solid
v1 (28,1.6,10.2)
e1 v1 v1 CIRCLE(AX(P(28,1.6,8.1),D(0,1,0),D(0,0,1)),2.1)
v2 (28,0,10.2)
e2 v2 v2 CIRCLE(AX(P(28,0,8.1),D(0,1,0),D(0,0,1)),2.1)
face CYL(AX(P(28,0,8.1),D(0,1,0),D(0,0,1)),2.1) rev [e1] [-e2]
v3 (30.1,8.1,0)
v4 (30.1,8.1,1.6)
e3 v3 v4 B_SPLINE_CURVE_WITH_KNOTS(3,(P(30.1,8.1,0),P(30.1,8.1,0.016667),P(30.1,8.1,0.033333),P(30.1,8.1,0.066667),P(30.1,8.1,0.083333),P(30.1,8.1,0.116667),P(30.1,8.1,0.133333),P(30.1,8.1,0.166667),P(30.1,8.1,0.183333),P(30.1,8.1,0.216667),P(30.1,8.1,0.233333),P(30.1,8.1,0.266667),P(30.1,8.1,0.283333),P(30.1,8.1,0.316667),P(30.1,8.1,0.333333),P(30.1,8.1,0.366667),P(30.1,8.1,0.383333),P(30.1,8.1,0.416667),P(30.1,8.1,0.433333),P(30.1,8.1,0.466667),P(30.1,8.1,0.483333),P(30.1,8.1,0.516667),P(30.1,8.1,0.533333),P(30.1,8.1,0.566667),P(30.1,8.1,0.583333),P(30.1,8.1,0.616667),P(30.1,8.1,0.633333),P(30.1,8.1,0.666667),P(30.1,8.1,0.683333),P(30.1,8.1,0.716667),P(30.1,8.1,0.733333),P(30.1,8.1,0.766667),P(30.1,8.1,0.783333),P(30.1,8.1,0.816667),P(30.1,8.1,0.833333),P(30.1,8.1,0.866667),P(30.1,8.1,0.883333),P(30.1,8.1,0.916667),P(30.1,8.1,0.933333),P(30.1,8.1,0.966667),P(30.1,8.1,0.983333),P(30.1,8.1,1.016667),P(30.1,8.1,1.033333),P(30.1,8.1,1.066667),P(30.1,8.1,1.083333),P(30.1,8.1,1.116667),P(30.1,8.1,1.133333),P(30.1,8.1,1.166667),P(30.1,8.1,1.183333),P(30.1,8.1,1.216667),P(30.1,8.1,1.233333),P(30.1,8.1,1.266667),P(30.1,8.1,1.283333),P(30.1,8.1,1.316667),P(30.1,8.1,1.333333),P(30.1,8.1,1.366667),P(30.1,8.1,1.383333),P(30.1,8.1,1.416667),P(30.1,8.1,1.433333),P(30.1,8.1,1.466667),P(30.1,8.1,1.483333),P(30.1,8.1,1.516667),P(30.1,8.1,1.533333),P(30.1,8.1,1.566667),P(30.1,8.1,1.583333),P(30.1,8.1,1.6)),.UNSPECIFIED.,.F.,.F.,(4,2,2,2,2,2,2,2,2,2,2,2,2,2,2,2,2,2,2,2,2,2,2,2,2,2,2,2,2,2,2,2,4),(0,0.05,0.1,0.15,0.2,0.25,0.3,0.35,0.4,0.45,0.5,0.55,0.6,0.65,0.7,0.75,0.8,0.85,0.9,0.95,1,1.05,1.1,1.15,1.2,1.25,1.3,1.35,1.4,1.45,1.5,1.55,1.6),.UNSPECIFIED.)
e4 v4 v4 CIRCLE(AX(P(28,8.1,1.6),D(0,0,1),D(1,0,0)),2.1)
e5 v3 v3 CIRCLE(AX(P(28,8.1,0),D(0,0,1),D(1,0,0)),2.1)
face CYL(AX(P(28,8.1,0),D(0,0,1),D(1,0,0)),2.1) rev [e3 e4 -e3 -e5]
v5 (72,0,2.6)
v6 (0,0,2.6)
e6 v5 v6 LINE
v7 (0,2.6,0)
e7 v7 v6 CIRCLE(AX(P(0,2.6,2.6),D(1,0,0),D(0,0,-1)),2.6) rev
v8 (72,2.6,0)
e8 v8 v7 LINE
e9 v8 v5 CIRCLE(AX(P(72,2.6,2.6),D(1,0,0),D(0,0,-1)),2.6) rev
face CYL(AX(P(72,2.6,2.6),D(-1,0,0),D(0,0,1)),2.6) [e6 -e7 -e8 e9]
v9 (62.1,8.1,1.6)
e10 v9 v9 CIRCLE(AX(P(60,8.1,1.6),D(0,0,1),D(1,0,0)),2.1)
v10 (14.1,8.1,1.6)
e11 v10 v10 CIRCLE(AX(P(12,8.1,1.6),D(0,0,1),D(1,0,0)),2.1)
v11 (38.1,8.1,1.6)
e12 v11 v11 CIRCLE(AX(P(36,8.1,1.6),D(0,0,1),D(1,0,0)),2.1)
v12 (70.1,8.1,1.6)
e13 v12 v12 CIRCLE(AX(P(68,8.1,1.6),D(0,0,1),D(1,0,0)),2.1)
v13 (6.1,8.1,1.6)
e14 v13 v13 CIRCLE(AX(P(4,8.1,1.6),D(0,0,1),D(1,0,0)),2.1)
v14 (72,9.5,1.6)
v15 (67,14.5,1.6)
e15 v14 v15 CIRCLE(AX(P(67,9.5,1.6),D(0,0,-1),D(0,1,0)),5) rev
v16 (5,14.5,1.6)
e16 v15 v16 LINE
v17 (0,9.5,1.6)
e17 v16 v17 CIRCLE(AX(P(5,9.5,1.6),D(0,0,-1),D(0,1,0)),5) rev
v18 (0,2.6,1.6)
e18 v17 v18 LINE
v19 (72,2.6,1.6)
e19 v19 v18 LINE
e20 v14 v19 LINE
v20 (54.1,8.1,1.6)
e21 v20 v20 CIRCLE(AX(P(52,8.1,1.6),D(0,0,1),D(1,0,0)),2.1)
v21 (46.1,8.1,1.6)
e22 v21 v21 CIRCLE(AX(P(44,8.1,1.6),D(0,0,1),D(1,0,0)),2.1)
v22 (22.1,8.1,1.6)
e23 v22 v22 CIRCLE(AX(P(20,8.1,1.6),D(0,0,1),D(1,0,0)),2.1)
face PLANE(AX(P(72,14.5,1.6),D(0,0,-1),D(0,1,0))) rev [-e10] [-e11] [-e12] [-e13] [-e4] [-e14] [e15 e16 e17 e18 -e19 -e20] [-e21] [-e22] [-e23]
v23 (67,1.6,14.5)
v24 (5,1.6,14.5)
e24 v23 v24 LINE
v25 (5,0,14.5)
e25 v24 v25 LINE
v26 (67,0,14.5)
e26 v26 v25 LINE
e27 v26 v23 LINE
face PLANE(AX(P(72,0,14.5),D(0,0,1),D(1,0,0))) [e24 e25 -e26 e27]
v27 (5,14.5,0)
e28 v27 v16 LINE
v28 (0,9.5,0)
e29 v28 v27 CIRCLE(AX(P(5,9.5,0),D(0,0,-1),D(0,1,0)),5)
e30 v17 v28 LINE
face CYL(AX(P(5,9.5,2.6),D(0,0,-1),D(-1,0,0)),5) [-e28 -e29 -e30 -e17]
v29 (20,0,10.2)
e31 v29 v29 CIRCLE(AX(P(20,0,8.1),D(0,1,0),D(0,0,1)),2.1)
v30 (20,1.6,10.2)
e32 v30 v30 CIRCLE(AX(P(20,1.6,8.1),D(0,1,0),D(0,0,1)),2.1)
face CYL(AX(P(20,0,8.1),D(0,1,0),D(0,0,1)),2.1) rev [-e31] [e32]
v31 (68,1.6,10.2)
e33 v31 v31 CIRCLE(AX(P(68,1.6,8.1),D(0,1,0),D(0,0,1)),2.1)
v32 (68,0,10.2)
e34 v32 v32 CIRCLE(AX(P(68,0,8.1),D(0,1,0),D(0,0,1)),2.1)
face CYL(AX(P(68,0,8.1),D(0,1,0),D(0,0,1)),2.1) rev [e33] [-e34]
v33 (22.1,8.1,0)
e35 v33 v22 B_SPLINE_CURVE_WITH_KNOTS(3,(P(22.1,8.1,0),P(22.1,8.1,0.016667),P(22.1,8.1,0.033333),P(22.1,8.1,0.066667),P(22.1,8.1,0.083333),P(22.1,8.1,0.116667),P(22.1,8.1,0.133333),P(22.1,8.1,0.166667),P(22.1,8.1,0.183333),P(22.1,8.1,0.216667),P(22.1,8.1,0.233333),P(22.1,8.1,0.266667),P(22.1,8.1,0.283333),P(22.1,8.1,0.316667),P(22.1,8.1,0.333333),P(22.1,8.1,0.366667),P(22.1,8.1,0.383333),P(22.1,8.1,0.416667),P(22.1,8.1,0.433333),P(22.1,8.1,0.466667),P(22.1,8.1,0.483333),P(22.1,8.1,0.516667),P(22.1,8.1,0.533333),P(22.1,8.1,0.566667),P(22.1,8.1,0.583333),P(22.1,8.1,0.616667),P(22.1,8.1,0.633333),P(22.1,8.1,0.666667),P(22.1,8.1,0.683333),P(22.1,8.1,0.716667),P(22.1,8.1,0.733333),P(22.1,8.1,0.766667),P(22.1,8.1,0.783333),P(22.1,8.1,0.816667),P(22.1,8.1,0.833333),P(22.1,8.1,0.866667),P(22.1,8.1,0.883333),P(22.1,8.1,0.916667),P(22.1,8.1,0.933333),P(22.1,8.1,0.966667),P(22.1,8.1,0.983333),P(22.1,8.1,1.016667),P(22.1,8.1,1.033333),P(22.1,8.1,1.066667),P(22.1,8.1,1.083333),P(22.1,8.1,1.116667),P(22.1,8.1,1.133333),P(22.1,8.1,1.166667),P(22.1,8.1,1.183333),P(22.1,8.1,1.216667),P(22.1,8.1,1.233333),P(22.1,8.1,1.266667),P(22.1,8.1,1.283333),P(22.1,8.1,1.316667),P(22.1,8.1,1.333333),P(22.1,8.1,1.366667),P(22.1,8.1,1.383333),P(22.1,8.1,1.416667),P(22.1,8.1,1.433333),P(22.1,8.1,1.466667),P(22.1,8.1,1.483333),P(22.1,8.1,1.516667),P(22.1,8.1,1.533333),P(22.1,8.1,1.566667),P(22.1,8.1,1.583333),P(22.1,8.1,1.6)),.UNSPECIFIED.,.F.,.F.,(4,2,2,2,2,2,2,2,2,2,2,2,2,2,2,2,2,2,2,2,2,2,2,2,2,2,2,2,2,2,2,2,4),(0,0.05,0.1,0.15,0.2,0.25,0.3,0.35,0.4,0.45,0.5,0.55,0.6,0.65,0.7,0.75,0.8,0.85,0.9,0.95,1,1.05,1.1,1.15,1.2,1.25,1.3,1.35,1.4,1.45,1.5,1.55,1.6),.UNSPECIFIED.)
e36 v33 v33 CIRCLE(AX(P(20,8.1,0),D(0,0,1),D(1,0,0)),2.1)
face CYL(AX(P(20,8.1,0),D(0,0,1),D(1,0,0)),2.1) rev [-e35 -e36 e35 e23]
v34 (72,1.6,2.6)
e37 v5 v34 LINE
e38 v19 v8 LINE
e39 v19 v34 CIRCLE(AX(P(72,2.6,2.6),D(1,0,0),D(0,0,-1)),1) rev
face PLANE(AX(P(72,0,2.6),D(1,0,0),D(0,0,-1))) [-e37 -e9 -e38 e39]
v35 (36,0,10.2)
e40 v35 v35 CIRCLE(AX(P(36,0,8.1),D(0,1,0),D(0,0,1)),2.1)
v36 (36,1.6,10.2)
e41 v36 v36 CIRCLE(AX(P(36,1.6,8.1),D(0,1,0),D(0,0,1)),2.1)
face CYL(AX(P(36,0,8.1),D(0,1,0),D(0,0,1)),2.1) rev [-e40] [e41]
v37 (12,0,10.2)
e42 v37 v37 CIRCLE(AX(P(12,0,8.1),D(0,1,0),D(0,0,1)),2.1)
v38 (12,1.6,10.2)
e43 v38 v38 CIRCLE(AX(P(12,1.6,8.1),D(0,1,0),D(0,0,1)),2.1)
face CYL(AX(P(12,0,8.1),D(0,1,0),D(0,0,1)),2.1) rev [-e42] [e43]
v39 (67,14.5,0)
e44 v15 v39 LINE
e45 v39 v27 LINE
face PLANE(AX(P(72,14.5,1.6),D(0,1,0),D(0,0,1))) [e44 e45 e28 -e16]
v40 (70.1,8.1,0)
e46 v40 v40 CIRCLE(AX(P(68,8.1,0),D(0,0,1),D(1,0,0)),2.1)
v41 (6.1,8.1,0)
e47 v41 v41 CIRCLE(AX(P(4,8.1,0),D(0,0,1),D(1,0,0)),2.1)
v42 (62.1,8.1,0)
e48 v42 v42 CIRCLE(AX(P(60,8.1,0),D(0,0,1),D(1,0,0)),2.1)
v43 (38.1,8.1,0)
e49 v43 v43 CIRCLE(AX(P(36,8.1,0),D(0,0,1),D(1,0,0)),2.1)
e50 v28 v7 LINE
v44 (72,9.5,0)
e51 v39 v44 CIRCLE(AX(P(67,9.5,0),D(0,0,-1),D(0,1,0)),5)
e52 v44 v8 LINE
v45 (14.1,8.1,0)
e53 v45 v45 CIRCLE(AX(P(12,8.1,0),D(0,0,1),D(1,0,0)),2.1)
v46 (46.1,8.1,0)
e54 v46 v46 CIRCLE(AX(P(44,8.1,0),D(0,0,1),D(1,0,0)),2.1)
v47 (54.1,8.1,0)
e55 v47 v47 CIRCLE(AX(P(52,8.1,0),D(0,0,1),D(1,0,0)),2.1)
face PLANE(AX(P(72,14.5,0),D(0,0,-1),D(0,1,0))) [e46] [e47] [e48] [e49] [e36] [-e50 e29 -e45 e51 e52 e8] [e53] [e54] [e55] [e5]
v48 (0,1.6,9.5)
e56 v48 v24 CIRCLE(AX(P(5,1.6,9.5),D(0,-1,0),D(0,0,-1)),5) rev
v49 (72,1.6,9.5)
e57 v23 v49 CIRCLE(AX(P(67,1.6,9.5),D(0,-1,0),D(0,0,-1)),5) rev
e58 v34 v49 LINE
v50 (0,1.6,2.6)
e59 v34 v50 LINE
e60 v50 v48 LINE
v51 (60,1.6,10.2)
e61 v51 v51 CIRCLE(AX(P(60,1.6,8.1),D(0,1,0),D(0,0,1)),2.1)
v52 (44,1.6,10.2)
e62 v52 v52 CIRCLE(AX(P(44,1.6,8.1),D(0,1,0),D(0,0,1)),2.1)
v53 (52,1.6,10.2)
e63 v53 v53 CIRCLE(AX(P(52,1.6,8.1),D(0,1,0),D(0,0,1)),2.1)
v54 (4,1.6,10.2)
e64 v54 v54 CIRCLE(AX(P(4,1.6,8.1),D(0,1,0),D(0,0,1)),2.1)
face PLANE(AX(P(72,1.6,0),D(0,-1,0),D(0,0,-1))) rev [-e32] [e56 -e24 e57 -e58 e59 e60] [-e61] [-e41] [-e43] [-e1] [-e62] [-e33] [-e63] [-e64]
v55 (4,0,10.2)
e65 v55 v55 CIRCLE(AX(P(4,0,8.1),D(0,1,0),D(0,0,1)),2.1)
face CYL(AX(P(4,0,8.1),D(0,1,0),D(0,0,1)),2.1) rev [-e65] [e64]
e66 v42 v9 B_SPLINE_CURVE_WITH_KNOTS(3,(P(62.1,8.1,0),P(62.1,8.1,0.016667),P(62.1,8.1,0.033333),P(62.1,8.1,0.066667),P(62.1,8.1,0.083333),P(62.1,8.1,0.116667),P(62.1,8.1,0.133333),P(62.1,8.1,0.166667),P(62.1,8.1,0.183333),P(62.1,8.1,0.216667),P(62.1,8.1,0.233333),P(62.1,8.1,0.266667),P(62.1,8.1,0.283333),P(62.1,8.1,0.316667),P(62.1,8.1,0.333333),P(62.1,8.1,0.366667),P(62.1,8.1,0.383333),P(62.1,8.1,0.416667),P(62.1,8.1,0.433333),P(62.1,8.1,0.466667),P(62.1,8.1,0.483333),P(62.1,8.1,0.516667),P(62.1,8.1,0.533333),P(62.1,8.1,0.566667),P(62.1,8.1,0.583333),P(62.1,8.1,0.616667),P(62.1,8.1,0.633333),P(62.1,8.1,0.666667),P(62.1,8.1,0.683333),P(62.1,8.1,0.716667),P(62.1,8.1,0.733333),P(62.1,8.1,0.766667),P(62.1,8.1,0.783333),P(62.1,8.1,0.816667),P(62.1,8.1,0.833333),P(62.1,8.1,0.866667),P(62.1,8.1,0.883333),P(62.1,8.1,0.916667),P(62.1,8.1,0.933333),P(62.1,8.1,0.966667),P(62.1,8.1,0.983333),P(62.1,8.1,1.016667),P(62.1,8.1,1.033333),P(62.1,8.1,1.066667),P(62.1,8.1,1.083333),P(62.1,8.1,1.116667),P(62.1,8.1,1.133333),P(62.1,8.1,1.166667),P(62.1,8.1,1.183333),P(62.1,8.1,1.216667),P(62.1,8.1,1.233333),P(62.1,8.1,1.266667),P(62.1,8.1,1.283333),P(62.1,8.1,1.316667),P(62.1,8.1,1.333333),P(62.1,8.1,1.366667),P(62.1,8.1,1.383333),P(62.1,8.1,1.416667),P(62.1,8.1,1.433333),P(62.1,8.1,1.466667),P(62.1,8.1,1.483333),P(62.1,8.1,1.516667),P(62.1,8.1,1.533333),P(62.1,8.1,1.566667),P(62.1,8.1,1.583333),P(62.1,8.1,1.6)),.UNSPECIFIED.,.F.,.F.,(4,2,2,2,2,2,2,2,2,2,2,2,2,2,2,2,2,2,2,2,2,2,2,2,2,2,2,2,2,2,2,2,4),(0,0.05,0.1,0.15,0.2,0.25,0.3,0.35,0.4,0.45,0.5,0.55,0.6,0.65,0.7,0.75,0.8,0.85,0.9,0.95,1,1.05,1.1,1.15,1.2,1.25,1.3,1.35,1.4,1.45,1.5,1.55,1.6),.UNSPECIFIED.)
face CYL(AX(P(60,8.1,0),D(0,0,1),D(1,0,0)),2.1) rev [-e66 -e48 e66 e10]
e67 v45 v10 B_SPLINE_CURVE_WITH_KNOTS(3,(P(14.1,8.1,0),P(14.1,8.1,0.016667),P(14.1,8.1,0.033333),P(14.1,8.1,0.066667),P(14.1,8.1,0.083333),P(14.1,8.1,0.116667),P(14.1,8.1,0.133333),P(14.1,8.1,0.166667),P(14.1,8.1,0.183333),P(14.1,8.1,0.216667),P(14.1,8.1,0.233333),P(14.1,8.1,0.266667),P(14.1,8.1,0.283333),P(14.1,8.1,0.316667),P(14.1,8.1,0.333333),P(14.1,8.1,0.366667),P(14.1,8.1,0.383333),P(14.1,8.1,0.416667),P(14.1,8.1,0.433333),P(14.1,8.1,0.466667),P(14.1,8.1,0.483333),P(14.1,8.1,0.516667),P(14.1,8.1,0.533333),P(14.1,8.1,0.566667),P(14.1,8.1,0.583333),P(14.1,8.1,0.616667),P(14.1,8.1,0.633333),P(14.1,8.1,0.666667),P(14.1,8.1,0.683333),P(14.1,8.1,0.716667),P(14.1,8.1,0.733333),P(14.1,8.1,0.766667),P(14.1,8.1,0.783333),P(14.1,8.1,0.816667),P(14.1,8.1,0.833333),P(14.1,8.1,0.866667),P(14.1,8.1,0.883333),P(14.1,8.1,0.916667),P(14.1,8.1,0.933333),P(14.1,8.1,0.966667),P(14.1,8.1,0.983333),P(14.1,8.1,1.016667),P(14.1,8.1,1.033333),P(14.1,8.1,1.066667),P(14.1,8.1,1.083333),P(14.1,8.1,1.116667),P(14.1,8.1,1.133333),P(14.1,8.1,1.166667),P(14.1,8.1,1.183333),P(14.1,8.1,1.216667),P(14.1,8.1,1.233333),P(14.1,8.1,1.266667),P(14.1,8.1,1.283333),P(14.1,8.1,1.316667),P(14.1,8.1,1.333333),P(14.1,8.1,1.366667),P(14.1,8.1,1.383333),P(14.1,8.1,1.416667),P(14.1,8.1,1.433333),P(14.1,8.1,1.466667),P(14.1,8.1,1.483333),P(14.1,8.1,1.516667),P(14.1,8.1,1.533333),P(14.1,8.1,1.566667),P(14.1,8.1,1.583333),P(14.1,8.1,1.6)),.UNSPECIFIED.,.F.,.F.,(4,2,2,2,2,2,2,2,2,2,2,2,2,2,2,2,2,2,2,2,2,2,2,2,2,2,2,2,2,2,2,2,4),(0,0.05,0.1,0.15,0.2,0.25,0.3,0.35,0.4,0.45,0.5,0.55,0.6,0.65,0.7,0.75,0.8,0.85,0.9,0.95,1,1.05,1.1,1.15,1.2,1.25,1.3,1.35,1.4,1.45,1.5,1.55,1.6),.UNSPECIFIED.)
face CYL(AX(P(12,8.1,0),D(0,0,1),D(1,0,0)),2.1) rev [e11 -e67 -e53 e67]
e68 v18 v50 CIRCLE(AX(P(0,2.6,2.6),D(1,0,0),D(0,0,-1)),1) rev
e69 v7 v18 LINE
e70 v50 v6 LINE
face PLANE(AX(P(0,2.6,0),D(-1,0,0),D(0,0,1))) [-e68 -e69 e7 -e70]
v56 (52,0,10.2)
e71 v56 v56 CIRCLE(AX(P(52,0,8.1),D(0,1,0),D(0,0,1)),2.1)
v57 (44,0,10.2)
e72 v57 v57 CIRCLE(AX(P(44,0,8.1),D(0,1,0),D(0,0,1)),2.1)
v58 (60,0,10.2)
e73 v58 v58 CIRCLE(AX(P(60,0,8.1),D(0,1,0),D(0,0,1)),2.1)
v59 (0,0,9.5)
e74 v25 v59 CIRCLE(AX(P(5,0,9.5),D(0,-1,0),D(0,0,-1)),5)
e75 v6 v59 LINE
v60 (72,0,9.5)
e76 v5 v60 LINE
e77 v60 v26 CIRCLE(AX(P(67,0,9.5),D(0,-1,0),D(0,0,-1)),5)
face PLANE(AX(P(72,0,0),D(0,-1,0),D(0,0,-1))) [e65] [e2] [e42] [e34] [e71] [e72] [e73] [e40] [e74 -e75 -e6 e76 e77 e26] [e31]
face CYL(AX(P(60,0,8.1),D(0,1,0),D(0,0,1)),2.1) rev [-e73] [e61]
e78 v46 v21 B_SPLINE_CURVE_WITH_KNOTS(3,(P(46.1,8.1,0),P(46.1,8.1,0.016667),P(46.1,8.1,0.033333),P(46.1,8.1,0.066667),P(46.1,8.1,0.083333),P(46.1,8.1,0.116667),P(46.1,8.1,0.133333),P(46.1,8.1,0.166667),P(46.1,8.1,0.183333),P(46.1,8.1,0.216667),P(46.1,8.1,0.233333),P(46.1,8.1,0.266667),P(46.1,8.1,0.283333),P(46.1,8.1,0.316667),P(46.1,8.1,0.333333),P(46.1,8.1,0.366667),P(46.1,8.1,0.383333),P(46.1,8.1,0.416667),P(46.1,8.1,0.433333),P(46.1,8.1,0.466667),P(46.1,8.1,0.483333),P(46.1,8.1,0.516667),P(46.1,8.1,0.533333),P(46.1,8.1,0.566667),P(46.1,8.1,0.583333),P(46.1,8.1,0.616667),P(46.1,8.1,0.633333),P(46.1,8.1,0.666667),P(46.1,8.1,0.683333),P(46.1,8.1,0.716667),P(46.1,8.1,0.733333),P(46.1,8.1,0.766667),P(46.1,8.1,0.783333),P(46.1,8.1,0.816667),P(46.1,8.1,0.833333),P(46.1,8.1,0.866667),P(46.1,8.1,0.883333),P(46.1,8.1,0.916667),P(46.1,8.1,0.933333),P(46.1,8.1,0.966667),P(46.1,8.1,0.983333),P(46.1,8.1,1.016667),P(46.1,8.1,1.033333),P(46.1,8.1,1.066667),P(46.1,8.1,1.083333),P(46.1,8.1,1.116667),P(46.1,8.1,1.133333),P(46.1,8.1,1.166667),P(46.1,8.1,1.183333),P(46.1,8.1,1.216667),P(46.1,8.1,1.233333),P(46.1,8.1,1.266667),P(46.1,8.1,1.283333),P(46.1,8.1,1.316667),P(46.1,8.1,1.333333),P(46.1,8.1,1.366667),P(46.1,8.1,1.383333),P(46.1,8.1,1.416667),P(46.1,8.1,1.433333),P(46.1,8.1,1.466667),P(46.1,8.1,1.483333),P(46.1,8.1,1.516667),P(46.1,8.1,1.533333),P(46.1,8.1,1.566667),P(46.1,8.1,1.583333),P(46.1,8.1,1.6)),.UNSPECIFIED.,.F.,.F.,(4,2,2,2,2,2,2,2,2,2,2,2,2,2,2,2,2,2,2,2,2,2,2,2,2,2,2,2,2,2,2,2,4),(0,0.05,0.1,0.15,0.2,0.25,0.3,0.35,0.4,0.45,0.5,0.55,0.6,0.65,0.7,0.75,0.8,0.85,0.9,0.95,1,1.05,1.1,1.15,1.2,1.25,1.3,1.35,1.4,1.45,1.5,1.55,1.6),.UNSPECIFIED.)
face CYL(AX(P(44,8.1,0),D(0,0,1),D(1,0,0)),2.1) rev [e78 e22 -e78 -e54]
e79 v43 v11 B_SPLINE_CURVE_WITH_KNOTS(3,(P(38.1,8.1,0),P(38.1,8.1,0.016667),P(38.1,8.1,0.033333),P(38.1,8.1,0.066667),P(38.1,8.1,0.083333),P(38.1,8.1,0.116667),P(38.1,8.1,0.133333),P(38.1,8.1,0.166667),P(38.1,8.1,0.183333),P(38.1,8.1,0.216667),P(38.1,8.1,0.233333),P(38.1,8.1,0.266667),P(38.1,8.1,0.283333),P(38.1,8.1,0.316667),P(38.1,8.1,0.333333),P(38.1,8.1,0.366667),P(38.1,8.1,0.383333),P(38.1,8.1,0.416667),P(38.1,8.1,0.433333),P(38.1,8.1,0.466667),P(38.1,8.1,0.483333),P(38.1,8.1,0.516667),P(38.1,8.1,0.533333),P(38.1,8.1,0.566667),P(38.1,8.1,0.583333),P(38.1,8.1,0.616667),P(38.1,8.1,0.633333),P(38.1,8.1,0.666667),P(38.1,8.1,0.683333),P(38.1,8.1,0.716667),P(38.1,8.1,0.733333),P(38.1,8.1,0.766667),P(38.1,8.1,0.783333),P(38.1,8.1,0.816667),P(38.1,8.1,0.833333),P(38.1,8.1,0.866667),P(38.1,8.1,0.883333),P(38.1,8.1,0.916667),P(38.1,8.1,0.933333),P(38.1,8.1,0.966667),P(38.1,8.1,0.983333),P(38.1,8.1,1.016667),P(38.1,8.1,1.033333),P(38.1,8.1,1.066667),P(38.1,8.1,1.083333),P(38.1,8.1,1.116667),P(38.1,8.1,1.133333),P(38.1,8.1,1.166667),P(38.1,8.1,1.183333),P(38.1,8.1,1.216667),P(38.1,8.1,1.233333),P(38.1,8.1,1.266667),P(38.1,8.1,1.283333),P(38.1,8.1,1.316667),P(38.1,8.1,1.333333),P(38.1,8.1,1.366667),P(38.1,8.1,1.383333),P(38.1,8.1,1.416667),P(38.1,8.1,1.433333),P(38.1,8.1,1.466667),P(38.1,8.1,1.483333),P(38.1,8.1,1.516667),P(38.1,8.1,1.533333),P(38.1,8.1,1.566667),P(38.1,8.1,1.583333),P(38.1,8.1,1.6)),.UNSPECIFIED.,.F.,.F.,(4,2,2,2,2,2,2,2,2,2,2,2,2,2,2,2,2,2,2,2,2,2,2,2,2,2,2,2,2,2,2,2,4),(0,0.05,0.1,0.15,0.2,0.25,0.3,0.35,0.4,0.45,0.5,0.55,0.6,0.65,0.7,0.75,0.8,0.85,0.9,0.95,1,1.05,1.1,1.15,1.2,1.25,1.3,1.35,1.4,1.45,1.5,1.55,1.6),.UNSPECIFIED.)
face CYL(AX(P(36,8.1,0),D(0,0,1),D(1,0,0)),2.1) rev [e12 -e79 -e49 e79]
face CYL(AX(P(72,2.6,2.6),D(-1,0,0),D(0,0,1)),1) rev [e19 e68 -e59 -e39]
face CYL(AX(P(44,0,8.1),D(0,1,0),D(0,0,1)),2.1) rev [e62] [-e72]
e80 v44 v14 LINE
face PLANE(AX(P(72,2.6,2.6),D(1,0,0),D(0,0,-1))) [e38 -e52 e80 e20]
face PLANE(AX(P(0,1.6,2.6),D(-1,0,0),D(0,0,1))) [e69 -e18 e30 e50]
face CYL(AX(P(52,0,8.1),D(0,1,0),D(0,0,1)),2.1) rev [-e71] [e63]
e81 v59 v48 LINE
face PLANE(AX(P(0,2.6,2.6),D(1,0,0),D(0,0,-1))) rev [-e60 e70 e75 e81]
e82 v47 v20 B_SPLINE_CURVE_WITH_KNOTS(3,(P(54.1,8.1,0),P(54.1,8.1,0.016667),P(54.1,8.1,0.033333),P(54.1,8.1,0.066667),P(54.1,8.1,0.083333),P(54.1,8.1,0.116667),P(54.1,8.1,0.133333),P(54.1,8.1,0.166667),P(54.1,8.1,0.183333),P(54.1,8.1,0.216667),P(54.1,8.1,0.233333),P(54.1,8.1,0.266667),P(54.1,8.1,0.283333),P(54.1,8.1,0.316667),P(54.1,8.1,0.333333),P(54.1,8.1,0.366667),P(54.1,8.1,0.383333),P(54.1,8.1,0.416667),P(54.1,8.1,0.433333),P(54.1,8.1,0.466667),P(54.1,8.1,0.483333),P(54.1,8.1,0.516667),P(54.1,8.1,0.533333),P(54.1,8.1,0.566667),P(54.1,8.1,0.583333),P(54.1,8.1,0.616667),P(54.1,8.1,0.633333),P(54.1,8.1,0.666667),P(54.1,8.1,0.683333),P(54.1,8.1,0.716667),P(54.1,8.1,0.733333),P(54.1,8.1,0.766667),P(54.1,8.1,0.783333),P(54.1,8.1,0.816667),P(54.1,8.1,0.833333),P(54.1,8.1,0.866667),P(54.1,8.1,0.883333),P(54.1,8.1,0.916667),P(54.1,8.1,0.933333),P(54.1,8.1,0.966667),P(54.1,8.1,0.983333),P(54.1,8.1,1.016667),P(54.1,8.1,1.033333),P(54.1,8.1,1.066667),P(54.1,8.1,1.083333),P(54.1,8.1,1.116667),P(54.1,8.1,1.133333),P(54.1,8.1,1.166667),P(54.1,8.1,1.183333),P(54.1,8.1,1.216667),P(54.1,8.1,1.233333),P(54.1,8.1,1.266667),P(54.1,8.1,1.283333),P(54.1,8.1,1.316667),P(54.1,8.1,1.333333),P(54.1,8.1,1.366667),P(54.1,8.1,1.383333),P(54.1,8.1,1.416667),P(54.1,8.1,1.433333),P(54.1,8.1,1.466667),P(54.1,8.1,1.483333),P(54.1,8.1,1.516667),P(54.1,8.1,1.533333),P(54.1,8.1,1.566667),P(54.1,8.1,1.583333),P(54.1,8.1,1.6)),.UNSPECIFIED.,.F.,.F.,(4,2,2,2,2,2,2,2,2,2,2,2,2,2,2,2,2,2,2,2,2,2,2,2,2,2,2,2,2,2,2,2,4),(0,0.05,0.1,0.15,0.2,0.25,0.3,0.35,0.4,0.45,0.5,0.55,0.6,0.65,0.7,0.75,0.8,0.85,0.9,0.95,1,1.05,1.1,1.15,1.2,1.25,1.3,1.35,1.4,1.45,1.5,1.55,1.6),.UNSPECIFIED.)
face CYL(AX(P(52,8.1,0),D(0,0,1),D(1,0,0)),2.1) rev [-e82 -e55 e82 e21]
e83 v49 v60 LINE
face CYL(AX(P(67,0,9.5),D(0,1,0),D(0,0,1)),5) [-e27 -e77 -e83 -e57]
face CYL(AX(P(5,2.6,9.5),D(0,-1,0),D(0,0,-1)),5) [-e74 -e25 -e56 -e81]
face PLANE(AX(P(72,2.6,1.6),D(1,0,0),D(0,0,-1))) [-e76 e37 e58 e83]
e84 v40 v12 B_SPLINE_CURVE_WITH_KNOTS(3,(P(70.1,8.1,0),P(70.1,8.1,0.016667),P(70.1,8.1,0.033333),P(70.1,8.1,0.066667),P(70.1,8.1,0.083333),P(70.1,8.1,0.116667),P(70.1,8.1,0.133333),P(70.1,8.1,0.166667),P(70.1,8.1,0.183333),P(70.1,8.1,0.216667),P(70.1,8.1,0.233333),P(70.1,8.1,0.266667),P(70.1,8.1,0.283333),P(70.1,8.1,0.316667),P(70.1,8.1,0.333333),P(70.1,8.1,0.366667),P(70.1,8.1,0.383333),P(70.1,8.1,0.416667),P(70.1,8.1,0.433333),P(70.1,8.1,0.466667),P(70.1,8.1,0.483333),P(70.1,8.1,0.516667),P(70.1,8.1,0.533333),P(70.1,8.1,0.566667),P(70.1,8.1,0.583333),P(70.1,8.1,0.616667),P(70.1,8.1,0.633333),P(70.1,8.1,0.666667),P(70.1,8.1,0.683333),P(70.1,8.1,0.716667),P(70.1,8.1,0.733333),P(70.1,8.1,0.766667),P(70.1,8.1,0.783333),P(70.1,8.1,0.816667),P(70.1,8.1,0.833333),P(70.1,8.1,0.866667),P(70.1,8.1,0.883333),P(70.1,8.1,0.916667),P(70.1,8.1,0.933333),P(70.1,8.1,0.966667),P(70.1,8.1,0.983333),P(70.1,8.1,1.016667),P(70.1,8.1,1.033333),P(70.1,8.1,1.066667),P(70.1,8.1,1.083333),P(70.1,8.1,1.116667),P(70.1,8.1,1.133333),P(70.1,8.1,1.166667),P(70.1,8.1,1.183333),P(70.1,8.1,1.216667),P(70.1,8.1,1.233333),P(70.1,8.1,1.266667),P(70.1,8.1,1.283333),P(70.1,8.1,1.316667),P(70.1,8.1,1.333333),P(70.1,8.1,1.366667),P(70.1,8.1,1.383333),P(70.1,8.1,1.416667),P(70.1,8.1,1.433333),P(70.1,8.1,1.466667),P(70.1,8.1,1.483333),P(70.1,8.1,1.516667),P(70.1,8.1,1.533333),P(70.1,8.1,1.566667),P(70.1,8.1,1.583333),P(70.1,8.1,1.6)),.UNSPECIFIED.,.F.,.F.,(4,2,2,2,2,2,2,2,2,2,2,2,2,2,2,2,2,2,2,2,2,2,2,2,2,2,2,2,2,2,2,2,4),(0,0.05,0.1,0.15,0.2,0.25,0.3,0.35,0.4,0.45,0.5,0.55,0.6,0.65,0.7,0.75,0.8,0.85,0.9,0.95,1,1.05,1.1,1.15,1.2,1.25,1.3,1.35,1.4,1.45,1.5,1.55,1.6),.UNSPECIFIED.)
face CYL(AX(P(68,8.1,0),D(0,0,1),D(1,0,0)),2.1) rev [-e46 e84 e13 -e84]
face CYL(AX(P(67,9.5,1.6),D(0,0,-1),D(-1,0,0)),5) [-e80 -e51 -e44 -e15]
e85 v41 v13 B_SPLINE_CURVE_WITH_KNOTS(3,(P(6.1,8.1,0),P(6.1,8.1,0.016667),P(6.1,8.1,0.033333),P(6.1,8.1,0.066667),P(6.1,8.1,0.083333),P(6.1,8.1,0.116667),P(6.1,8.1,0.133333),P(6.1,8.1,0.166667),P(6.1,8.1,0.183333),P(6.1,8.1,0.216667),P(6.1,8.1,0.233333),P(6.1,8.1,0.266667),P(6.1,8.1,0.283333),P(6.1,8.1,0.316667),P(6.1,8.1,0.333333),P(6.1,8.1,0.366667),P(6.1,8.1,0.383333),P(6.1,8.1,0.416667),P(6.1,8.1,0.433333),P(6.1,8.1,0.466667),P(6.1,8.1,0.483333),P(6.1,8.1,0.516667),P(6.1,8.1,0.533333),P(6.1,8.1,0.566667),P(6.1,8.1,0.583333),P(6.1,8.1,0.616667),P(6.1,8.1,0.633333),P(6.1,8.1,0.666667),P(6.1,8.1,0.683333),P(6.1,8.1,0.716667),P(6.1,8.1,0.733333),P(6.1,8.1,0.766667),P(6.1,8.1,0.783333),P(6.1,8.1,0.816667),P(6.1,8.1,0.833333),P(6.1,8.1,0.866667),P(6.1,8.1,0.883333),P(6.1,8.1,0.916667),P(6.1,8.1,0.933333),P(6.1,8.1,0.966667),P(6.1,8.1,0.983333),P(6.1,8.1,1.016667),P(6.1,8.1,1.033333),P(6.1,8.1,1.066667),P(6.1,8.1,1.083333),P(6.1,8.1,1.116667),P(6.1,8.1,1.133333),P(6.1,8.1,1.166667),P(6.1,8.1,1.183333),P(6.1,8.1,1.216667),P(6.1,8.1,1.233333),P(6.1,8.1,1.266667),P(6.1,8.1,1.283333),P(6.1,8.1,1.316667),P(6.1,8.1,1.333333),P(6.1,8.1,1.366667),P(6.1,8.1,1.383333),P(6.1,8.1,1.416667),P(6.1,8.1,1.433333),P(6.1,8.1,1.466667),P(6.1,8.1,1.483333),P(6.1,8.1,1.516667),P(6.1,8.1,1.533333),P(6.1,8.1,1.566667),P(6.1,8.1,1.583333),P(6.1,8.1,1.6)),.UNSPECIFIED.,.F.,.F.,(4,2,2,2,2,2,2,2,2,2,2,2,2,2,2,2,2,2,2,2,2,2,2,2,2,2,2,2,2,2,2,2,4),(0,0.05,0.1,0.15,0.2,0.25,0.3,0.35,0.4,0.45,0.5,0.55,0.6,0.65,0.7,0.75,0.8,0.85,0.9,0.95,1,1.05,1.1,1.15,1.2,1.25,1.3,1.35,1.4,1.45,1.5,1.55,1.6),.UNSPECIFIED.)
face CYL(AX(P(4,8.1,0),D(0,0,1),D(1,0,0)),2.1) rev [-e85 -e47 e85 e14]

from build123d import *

# Parameters (mm, degrees)
BASE_FLANGE1_DEPTH = 72
FILLET1_R          = 5
SKETCH6_R          = 2.1
CUT_EXTRUDE1_DEPTH = 75.569833043
SKETCH7_R          = 2.1
CUT_EXTRUDE2_DEPTH = 75.569833043
LPATTERN1_COUNT    = 9
LPATTERN1_PITCH    = 8


# Sheet-metal steps are written as plain solids
with BuildPart() as part:
    # Sketch1 → Base-Flange1 (new body)
    with BuildSketch(Plane(origin=(0, 0, 0), x_dir=(0, 0, -1), z_dir=(1, 0, 0))):
        with BuildLine():
            Line((0, 14.5), (0, 2.6))
            ThreePointArc((0, 2.6), (-0.761522369, 0.761522369), (-2.6, 0))
            Line((-2.6, 0), (-14.5, 0))
            Line((-14.5, 0), (-14.5, 1.6))
            Line((-14.5, 1.6), (-2.6, 1.6))
            ThreePointArc((-2.6, 1.6), (-1.892893219, 1.892893219), (-1.6, 2.6))
            Line((-1.6, 2.6), (-1.6, 14.5))
            Line((-1.6, 14.5), (0, 14.5))
        make_face()
    extrude(amount=BASE_FLANGE1_DEPTH)

    # Fillet1
    fillet1_edges = [part.edges().sort_by_distance(p)[0] for p in [
        (72, 14.5, 0.8),
        (72, 0.8, 14.5),
        (0, 14.5, 0.8),
        (0, 0.8, 14.5),
    ]]
    fillet(fillet1_edges, radius=FILLET1_R)

    # Sketch6 → Cut-Extrude1 (cut, through all)
    with BuildSketch(Plane.XY.offset(1.6)):
        with Locations((4, 8.1)):
            Circle(SKETCH6_R)
    cut_extrude1 = extrude(amount=-CUT_EXTRUDE1_DEPTH, mode=Mode.SUBTRACT)

    # Sketch7 → Cut-Extrude2 (cut, through all)
    with BuildSketch(Plane(origin=(0, 1.6, 0), x_dir=(1, 0, 0), z_dir=(0, 1, 0))):
        with Locations(Location((4, -8.1, 0), (0, 0, 270))):
            Circle(SKETCH7_R)
    cut_extrude2 = extrude(amount=-CUT_EXTRUDE2_DEPTH, mode=Mode.SUBTRACT)

    # LPattern1: Cut-Extrude1, Cut-Extrude2 ×9
    with Locations(*[(i * LPATTERN1_PITCH, 0, 0) for i in range(1, LPATTERN1_COUNT)]):
        add(cut_extrude1, mode=Mode.SUBTRACT)
        add(cut_extrude2, mode=Mode.SUBTRACT)


solid = part.part
